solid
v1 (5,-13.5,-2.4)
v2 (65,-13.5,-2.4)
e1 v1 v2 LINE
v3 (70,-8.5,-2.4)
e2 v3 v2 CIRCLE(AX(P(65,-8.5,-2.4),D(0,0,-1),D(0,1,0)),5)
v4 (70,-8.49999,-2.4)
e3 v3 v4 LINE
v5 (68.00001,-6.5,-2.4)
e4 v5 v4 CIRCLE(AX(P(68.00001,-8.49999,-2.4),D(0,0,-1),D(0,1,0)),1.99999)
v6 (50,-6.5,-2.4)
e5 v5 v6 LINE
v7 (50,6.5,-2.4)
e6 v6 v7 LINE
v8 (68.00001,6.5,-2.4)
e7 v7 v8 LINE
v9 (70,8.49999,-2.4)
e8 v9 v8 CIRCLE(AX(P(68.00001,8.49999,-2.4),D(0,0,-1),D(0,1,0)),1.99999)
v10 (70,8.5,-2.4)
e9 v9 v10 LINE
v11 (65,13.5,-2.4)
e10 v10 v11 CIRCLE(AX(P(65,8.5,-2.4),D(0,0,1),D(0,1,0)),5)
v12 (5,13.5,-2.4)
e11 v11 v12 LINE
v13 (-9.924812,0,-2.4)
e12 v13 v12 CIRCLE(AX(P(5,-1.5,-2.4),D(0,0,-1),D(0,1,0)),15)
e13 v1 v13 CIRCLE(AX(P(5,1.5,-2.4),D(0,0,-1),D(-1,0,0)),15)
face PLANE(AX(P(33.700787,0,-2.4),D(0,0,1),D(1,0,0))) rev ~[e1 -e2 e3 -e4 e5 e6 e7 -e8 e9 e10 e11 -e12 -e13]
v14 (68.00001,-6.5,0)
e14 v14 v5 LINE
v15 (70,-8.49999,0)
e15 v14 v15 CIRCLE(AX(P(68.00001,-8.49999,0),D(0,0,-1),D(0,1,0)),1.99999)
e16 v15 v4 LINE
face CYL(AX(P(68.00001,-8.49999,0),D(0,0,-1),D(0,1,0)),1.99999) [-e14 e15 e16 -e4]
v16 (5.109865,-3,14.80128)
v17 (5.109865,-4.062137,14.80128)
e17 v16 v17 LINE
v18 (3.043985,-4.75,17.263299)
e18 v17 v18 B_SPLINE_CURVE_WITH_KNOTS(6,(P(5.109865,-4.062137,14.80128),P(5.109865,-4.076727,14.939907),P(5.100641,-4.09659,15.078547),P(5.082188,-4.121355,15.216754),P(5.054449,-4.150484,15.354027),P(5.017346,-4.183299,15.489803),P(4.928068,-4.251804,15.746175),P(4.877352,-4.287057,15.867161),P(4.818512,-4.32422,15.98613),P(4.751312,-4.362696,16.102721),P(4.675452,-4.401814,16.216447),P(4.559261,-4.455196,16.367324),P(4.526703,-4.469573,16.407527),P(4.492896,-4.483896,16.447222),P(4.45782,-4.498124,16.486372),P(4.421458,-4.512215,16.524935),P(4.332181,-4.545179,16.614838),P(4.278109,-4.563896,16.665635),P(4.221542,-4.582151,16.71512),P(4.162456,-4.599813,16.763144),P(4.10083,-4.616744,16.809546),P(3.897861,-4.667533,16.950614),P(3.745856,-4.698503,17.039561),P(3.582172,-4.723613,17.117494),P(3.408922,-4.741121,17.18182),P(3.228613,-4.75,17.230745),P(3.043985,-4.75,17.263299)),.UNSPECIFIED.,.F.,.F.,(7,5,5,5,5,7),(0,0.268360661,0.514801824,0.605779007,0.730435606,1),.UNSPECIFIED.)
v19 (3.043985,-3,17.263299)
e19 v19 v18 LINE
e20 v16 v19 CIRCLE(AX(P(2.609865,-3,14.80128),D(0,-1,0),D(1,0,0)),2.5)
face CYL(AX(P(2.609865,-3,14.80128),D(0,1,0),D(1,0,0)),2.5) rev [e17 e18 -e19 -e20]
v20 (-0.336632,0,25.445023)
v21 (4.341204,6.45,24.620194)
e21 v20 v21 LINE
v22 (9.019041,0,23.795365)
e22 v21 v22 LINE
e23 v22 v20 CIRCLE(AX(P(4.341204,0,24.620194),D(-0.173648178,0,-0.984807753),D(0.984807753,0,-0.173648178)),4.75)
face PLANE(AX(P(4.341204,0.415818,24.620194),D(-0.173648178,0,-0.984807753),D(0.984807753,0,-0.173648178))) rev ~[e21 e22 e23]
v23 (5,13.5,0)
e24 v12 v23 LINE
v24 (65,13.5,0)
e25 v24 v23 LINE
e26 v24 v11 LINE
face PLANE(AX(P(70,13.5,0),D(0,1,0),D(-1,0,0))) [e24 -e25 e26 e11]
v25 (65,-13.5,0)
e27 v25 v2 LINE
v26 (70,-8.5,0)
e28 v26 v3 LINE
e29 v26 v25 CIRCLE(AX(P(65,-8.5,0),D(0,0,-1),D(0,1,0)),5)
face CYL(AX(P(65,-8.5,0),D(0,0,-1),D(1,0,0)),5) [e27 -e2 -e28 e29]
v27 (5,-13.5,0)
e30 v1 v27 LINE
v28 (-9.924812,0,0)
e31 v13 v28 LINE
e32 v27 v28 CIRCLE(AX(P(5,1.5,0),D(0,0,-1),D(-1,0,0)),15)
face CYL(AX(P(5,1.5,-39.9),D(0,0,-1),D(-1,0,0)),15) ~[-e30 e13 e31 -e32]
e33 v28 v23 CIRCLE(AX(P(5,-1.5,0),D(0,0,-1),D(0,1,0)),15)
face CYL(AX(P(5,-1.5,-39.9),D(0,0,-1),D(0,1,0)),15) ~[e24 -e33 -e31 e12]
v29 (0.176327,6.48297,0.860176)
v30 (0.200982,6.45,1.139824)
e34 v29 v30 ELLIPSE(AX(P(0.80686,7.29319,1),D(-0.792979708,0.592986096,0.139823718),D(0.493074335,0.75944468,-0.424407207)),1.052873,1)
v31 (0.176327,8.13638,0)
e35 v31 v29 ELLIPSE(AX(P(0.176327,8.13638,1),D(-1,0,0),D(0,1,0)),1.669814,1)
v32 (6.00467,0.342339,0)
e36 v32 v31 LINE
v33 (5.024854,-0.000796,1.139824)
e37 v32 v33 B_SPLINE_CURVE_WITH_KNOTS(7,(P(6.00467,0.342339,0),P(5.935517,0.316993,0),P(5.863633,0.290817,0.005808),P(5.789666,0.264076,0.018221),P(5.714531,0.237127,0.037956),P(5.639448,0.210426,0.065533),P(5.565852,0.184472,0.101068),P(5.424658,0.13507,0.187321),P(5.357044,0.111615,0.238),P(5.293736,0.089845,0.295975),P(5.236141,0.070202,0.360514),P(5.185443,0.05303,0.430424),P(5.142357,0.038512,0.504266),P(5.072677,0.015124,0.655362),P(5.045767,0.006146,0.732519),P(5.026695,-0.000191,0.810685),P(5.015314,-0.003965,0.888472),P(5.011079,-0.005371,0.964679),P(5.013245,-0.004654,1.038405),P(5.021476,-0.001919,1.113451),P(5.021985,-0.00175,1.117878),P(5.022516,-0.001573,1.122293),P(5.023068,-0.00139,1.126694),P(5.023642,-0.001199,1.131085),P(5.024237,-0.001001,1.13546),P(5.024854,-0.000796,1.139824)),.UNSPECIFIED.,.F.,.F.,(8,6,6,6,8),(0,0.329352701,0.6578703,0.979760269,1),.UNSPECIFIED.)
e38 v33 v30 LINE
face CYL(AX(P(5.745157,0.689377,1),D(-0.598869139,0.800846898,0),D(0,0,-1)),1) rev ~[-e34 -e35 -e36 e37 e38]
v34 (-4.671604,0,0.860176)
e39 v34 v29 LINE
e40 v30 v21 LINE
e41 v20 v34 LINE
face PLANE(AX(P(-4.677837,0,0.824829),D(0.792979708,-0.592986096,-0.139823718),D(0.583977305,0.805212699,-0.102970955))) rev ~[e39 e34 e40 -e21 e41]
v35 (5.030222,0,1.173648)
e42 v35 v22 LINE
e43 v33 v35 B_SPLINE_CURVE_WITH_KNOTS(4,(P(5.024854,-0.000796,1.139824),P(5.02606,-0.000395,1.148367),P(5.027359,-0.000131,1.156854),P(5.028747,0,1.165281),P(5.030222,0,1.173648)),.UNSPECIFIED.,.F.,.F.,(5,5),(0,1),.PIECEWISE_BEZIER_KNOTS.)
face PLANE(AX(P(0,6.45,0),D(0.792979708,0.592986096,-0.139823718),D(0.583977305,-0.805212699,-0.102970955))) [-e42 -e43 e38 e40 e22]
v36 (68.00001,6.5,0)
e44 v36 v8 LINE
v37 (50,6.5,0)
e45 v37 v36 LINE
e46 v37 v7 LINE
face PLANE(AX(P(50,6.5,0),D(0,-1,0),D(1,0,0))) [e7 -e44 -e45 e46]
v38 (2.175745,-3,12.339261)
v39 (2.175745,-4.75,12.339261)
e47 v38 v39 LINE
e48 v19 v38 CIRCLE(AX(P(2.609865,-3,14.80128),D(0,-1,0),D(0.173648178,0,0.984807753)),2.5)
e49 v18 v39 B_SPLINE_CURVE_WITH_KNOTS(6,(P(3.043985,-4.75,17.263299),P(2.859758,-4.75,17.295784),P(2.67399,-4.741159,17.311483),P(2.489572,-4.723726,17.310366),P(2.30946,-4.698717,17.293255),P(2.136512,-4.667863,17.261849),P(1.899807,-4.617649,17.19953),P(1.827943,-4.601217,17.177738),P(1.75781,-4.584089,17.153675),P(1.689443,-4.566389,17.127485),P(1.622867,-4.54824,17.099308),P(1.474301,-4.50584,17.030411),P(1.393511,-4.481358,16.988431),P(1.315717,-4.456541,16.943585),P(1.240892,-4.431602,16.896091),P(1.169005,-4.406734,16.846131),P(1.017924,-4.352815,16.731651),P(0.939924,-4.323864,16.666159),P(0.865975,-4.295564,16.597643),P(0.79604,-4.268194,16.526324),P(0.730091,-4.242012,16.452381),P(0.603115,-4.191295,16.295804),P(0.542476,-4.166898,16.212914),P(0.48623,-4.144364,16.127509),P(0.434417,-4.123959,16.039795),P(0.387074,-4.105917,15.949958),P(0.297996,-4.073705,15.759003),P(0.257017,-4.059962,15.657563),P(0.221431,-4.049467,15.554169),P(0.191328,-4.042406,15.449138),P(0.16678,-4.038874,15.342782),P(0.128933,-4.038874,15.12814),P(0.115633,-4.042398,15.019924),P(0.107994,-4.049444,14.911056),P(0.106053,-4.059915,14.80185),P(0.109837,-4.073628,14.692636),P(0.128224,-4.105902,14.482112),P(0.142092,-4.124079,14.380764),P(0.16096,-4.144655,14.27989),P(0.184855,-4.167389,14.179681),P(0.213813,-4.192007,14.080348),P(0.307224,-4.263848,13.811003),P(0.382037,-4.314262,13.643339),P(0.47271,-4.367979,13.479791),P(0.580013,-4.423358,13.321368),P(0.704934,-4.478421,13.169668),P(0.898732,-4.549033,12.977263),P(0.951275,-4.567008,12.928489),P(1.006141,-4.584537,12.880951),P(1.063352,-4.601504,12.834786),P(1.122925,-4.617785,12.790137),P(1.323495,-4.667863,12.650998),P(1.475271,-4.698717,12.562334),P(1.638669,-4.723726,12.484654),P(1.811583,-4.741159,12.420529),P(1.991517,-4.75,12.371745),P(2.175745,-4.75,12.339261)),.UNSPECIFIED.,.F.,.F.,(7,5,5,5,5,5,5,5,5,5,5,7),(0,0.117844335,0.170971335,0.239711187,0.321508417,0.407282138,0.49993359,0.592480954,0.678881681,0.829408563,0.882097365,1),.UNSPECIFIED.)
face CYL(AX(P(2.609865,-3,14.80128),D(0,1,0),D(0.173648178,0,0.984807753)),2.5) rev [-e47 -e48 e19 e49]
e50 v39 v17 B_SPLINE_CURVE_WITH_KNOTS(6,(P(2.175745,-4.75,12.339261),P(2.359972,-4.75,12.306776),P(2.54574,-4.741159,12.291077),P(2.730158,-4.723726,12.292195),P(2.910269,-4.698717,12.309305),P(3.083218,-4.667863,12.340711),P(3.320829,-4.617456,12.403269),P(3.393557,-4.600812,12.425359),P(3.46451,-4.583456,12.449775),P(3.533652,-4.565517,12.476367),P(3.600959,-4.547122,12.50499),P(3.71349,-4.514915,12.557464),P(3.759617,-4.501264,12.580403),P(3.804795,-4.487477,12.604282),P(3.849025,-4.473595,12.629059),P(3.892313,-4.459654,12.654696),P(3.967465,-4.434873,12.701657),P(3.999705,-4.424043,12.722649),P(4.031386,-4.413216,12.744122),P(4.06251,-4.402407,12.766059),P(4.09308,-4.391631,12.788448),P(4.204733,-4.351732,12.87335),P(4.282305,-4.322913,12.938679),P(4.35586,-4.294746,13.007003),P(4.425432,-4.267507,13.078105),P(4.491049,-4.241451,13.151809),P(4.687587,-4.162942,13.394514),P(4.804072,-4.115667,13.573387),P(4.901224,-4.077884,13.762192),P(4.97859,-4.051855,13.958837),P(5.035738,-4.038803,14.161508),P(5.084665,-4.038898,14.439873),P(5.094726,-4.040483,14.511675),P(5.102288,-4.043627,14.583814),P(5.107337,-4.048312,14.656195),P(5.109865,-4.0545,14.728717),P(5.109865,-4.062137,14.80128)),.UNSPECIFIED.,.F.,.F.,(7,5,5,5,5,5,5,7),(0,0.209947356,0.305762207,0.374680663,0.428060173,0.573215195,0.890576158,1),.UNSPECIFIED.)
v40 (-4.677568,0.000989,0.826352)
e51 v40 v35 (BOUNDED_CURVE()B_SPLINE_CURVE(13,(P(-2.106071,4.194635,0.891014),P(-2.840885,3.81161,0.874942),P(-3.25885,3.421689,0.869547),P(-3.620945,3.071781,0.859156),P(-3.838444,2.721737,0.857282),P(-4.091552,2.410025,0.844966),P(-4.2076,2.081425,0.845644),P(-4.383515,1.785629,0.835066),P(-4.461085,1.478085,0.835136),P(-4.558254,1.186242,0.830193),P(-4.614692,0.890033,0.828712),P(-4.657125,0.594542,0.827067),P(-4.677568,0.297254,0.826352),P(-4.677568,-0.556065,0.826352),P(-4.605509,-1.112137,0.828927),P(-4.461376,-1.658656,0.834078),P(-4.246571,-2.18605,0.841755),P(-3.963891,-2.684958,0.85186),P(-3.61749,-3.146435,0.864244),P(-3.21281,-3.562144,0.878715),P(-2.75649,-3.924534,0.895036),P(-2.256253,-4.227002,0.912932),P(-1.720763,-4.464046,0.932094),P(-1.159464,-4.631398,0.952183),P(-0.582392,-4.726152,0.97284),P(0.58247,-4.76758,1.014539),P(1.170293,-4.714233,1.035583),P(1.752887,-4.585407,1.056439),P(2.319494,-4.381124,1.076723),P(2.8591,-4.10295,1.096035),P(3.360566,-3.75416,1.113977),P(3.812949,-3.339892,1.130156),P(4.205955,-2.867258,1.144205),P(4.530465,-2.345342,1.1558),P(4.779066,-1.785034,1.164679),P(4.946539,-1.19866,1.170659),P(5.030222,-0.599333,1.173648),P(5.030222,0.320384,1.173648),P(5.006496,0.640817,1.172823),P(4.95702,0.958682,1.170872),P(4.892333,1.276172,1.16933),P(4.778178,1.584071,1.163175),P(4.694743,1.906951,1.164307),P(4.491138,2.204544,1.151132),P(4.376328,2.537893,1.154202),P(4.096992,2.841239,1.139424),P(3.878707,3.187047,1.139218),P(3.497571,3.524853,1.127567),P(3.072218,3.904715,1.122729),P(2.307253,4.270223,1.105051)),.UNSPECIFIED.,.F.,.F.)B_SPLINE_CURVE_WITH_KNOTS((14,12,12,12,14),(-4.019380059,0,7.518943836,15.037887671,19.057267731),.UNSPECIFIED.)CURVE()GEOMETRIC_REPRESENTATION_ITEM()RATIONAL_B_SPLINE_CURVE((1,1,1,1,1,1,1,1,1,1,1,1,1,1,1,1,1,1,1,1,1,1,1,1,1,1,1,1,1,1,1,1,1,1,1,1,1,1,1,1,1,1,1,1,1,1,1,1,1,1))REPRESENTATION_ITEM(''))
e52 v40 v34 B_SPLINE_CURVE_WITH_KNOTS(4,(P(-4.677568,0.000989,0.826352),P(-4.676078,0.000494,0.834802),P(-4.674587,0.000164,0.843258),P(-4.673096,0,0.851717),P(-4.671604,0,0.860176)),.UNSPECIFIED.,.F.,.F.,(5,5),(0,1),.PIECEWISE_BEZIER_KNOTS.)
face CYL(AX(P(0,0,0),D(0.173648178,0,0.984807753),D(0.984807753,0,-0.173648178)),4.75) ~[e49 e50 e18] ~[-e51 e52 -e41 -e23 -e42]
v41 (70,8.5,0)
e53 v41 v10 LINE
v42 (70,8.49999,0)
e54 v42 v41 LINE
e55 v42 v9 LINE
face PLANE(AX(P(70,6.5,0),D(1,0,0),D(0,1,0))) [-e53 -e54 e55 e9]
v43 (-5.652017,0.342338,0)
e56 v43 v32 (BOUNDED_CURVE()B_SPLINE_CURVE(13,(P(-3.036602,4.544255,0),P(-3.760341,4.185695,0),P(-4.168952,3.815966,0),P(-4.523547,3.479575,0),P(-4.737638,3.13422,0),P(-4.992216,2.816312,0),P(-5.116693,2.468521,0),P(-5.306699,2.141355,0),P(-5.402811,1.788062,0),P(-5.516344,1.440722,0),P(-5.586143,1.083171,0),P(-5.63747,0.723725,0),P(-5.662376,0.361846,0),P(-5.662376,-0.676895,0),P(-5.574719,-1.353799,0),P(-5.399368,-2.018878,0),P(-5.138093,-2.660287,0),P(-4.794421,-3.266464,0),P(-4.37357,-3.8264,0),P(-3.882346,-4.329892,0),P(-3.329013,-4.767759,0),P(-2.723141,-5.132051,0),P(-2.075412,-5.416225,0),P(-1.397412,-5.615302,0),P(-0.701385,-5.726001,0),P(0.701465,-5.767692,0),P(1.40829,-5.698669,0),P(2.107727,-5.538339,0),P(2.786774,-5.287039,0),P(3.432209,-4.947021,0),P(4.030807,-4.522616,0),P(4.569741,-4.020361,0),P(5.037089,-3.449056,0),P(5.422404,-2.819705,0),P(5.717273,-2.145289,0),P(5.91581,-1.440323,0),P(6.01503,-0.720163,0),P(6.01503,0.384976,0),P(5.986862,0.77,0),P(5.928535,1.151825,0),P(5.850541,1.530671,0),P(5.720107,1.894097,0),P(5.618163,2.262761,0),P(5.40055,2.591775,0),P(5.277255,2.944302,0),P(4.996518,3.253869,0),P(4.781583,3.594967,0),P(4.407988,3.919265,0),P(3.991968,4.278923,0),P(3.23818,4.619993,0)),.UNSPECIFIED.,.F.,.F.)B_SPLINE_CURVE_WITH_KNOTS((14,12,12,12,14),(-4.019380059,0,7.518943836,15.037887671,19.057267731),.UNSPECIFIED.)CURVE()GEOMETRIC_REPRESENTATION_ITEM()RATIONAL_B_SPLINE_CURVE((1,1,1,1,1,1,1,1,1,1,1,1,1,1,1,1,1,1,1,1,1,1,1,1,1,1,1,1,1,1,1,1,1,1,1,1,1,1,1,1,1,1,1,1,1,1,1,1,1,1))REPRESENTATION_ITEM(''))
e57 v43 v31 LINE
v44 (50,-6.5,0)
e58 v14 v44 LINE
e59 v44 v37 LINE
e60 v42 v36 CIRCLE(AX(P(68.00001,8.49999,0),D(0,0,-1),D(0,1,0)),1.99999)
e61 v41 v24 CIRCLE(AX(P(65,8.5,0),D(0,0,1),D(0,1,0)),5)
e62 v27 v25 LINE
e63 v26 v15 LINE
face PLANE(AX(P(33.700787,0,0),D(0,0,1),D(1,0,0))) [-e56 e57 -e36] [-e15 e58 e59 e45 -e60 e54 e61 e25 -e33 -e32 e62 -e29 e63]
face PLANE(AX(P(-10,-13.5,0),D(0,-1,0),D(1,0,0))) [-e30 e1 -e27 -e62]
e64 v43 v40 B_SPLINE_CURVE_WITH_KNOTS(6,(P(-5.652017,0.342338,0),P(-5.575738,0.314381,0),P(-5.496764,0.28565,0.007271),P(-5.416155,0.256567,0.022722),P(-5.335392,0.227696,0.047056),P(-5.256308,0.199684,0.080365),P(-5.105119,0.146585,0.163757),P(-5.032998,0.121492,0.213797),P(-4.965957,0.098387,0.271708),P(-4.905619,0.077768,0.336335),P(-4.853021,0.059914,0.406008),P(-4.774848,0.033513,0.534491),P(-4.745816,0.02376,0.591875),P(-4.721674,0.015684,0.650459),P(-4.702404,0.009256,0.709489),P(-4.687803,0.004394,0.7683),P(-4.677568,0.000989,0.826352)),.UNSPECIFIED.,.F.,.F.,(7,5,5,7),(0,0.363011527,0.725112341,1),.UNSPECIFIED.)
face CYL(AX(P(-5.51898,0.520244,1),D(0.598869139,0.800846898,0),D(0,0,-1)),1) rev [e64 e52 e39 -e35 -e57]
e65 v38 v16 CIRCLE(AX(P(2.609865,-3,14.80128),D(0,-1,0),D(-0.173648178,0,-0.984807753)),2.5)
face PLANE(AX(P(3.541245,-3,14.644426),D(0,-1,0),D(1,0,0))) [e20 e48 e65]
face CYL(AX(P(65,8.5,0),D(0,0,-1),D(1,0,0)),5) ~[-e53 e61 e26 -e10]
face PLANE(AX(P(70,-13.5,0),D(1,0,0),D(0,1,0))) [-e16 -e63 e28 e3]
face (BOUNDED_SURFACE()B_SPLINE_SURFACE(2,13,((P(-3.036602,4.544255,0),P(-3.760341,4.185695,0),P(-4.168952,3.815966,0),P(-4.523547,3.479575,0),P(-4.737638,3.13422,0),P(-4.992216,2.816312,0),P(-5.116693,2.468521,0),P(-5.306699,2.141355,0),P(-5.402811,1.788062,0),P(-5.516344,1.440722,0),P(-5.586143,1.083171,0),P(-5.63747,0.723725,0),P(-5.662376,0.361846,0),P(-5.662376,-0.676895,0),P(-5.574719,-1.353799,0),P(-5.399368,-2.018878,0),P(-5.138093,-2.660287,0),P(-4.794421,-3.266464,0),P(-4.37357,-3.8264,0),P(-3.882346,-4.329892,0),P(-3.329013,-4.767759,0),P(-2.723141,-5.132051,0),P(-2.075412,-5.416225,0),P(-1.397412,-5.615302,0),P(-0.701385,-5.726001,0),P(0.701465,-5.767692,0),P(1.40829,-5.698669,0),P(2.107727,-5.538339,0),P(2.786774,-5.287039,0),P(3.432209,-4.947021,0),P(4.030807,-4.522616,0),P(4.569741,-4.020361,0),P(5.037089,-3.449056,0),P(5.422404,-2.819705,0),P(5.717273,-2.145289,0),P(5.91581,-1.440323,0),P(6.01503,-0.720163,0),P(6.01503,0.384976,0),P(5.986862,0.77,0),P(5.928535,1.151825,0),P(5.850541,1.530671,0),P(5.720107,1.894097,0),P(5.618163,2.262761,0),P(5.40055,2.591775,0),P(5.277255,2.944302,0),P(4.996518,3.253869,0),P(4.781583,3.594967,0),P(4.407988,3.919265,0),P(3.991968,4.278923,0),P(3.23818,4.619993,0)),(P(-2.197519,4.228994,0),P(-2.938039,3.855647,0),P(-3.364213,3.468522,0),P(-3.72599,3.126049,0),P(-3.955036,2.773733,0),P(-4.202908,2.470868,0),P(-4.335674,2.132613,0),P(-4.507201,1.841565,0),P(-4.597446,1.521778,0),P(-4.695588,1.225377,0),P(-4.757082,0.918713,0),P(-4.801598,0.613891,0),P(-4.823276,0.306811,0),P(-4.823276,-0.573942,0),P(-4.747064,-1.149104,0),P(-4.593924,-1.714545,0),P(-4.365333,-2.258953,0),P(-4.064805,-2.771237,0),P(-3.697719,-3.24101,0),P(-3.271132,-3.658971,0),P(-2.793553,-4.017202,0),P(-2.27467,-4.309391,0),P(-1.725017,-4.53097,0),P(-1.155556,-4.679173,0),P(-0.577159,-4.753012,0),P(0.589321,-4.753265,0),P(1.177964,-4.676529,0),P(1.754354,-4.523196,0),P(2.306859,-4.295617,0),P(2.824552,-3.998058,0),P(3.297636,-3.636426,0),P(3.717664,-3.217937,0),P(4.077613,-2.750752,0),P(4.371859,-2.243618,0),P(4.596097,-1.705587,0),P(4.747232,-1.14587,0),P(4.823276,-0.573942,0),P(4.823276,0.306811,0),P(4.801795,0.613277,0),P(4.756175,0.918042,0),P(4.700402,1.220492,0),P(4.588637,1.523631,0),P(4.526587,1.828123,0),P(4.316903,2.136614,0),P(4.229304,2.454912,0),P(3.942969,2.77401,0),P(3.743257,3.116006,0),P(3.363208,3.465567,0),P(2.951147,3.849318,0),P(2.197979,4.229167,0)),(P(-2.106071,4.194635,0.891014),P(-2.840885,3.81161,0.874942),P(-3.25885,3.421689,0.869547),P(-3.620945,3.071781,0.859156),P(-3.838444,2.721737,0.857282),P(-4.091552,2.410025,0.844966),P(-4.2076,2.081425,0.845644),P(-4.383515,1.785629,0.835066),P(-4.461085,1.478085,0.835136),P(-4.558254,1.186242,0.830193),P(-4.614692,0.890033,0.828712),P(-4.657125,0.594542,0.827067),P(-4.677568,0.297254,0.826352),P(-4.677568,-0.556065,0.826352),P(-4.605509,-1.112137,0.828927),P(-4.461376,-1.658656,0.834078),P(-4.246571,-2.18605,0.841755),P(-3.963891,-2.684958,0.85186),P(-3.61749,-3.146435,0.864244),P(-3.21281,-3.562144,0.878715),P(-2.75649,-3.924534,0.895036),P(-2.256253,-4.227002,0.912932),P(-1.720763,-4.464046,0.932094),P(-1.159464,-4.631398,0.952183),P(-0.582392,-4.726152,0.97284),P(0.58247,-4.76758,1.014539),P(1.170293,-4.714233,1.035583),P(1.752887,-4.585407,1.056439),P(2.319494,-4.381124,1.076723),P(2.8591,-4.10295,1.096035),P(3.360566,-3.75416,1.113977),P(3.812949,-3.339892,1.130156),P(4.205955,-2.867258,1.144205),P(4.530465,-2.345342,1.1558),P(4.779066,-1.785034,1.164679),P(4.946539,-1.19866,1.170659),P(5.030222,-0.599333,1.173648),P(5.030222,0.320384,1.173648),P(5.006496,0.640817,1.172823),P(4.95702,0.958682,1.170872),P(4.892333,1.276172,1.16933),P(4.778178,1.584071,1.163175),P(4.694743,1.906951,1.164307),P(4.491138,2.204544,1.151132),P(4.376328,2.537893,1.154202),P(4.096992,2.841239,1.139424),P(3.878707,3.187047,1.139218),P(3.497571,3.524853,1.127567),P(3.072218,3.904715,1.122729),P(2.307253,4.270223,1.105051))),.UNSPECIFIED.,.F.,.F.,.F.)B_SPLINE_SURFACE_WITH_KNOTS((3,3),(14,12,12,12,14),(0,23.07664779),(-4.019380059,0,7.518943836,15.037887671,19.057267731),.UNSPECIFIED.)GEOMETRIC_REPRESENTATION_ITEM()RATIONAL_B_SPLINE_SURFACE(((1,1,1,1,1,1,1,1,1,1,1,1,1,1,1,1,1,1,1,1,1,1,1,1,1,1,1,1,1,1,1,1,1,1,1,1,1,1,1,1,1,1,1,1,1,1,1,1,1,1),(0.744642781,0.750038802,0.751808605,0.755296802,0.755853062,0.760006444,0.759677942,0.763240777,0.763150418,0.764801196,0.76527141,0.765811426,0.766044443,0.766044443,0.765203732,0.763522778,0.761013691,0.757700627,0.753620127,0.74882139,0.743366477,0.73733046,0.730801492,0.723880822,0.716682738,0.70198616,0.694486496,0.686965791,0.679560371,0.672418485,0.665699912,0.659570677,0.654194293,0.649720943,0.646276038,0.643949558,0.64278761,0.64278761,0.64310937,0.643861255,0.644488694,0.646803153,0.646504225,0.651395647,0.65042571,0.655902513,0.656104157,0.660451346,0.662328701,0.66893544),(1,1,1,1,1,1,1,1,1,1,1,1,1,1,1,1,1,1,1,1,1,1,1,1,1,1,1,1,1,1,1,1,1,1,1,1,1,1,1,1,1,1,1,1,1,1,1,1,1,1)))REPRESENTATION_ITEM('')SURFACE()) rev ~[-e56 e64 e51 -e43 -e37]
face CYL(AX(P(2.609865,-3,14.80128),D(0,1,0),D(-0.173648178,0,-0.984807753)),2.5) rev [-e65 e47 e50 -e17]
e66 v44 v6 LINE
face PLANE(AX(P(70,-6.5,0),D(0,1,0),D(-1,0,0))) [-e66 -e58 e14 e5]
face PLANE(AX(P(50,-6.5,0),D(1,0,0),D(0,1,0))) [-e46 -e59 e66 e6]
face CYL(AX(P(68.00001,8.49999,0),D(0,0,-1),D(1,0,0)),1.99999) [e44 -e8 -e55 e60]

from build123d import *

# Parameters (mm, degrees)
F1_DEPTH      = 2.4
F4_DEPTH      = 25
F4_DEPTH_BACK = 1
F5_R          = 5
F6_T1_DEPTH   = 77.4
F7_R          = 1
F8_R          = 1.99999
F10_START     = 3
F10_DEPTH     = 22


# Not quite as in the source:
# - a fillet or chamfer that OpenCascade refuses, or shapes differently, is made with other operations: its cross-section is extruded or revolved along the edge and cut away or added
# - a fillet or chamfer is up to 0.001 mm smaller than in the source, because OpenCascade refuses the exact size


with BuildPart() as f1:
    # F0 (on Top) → F1 (new body)
    with BuildSketch(Plane.XY):
        Polygon((70, 13.5), (-10, 13.5), (-10, -13.5), (70, -13.5), (70, -6.5), (50, -6.5), (50, 6.5), (70, 6.5), align=None)
        with BuildLine():
            ThreePointArc((4.75, 0), (0, -4.75), (-4.75, 0))
            Line((-4.75, 0), (0, 6.45))
            Line((0, 6.45), (4.75, 0))
        make_face(mode=Mode.SUBTRACT)
        with BuildLine():
            Line((0, 6.45), (-4.75, 0))
            ThreePointArc((-4.75, 0), (0, -4.75), (4.75, 0))
            Line((4.75, 0), (0, 6.45))
        make_face()
    extrude(amount=-F1_DEPTH)

    # F3 (on line) → F4 (join, two sides)
    with BuildSketch(Plane(origin=(0, 0, 0), x_dir=(0.984807753, 0, -0.1736481777), z_dir=(-0.1736481777, 0, -0.984807753))) as f4_sk:
        with BuildLine():
            ThreePointArc((4.75, 0), (0, 4.75), (-4.75, 0))
            Line((-4.75, 0), (0, -6.45))
            Line((0, -6.45), (4.75, 0))
        make_face()
    extrude(amount=-F4_DEPTH)
    extrude(f4_sk.sketch, amount=F4_DEPTH_BACK)

    # F5
    f5_edges = [f1.edges().sort_by_distance(p)[0] for p in [
        (70, -13.5, -1.2),
        (70, 13.5, -1.2),
    ]]
    fillet(f5_edges, radius=F5_R)

    # F6: fillet of radius 15 on 2 edges, made by hand

    # F6_s2 → F6_t1 (cut)
    with BuildSketch(Plane.XY.offset(-39.9)):
        with BuildLine():
            ThreePointArc((-10, 1.5), (-5.6066017178, -9.1066017178), (5, -13.5))
            Line((5, -13.5), (-10, -13.5))
            Line((-10, -13.5), (-10, 1.5))
        make_face()
        with BuildLine():
            ThreePointArc((5, 13.5), (-5.6066017178, 9.1066017178), (-10, -1.5))
            Line((-10, -1.5), (-10, 13.5))
            Line((-10, 13.5), (5, 13.5))
        make_face()
    extrude(amount=F6_T1_DEPTH, mode=Mode.SUBTRACT)

    # F7
    f7_edges = [f1.edges().sort_by_distance(p)[0] for p in [
        (0, -4.75, 0),
        (-2.411638, 3.225, 0),
        (2.411638, 3.225, 0),
    ]]
    fillet(f7_edges, radius=F7_R)

    # F8 (radius 2 in the source; OpenCascade refuses exactly that, so slightly less here)
    f8_edges = [f1.edges().sort_by_distance(p)[0] for p in [
        (70, 6.5, -1.2),
        (70, -6.5, -1.2),
    ]]
    fillet(f8_edges, radius=F8_R)

    # F9 (on Front) → F10 (cut)
    with BuildSketch(Plane.XZ.offset(F10_START)):
        with BuildLine():
            ThreePointArc((2.1757445863, 12.3392607162), (4.2168340546, 12.8861689909), (5.1098650304, 14.8012800987))
            ThreePointArc((5.1098650304, 14.8012800987), (4.5249761382, 16.4082491229), (3.0439854746, 17.2632994812))
            Line((3.0439854746, 17.2632994812), (2.1757445863, 12.3392607162))
        make_face()
        with BuildLine():
            Line((2.1757445863, 12.3392607162), (3.0439854746, 17.2632994812))
            ThreePointArc((3.0439854746, 17.2632994812), (0.1478456479, 15.2354005429), (2.1757445863, 12.3392607162))
        make_face()
    extrude(amount=F10_DEPTH, mode=Mode.SUBTRACT)


solid = f1.part
